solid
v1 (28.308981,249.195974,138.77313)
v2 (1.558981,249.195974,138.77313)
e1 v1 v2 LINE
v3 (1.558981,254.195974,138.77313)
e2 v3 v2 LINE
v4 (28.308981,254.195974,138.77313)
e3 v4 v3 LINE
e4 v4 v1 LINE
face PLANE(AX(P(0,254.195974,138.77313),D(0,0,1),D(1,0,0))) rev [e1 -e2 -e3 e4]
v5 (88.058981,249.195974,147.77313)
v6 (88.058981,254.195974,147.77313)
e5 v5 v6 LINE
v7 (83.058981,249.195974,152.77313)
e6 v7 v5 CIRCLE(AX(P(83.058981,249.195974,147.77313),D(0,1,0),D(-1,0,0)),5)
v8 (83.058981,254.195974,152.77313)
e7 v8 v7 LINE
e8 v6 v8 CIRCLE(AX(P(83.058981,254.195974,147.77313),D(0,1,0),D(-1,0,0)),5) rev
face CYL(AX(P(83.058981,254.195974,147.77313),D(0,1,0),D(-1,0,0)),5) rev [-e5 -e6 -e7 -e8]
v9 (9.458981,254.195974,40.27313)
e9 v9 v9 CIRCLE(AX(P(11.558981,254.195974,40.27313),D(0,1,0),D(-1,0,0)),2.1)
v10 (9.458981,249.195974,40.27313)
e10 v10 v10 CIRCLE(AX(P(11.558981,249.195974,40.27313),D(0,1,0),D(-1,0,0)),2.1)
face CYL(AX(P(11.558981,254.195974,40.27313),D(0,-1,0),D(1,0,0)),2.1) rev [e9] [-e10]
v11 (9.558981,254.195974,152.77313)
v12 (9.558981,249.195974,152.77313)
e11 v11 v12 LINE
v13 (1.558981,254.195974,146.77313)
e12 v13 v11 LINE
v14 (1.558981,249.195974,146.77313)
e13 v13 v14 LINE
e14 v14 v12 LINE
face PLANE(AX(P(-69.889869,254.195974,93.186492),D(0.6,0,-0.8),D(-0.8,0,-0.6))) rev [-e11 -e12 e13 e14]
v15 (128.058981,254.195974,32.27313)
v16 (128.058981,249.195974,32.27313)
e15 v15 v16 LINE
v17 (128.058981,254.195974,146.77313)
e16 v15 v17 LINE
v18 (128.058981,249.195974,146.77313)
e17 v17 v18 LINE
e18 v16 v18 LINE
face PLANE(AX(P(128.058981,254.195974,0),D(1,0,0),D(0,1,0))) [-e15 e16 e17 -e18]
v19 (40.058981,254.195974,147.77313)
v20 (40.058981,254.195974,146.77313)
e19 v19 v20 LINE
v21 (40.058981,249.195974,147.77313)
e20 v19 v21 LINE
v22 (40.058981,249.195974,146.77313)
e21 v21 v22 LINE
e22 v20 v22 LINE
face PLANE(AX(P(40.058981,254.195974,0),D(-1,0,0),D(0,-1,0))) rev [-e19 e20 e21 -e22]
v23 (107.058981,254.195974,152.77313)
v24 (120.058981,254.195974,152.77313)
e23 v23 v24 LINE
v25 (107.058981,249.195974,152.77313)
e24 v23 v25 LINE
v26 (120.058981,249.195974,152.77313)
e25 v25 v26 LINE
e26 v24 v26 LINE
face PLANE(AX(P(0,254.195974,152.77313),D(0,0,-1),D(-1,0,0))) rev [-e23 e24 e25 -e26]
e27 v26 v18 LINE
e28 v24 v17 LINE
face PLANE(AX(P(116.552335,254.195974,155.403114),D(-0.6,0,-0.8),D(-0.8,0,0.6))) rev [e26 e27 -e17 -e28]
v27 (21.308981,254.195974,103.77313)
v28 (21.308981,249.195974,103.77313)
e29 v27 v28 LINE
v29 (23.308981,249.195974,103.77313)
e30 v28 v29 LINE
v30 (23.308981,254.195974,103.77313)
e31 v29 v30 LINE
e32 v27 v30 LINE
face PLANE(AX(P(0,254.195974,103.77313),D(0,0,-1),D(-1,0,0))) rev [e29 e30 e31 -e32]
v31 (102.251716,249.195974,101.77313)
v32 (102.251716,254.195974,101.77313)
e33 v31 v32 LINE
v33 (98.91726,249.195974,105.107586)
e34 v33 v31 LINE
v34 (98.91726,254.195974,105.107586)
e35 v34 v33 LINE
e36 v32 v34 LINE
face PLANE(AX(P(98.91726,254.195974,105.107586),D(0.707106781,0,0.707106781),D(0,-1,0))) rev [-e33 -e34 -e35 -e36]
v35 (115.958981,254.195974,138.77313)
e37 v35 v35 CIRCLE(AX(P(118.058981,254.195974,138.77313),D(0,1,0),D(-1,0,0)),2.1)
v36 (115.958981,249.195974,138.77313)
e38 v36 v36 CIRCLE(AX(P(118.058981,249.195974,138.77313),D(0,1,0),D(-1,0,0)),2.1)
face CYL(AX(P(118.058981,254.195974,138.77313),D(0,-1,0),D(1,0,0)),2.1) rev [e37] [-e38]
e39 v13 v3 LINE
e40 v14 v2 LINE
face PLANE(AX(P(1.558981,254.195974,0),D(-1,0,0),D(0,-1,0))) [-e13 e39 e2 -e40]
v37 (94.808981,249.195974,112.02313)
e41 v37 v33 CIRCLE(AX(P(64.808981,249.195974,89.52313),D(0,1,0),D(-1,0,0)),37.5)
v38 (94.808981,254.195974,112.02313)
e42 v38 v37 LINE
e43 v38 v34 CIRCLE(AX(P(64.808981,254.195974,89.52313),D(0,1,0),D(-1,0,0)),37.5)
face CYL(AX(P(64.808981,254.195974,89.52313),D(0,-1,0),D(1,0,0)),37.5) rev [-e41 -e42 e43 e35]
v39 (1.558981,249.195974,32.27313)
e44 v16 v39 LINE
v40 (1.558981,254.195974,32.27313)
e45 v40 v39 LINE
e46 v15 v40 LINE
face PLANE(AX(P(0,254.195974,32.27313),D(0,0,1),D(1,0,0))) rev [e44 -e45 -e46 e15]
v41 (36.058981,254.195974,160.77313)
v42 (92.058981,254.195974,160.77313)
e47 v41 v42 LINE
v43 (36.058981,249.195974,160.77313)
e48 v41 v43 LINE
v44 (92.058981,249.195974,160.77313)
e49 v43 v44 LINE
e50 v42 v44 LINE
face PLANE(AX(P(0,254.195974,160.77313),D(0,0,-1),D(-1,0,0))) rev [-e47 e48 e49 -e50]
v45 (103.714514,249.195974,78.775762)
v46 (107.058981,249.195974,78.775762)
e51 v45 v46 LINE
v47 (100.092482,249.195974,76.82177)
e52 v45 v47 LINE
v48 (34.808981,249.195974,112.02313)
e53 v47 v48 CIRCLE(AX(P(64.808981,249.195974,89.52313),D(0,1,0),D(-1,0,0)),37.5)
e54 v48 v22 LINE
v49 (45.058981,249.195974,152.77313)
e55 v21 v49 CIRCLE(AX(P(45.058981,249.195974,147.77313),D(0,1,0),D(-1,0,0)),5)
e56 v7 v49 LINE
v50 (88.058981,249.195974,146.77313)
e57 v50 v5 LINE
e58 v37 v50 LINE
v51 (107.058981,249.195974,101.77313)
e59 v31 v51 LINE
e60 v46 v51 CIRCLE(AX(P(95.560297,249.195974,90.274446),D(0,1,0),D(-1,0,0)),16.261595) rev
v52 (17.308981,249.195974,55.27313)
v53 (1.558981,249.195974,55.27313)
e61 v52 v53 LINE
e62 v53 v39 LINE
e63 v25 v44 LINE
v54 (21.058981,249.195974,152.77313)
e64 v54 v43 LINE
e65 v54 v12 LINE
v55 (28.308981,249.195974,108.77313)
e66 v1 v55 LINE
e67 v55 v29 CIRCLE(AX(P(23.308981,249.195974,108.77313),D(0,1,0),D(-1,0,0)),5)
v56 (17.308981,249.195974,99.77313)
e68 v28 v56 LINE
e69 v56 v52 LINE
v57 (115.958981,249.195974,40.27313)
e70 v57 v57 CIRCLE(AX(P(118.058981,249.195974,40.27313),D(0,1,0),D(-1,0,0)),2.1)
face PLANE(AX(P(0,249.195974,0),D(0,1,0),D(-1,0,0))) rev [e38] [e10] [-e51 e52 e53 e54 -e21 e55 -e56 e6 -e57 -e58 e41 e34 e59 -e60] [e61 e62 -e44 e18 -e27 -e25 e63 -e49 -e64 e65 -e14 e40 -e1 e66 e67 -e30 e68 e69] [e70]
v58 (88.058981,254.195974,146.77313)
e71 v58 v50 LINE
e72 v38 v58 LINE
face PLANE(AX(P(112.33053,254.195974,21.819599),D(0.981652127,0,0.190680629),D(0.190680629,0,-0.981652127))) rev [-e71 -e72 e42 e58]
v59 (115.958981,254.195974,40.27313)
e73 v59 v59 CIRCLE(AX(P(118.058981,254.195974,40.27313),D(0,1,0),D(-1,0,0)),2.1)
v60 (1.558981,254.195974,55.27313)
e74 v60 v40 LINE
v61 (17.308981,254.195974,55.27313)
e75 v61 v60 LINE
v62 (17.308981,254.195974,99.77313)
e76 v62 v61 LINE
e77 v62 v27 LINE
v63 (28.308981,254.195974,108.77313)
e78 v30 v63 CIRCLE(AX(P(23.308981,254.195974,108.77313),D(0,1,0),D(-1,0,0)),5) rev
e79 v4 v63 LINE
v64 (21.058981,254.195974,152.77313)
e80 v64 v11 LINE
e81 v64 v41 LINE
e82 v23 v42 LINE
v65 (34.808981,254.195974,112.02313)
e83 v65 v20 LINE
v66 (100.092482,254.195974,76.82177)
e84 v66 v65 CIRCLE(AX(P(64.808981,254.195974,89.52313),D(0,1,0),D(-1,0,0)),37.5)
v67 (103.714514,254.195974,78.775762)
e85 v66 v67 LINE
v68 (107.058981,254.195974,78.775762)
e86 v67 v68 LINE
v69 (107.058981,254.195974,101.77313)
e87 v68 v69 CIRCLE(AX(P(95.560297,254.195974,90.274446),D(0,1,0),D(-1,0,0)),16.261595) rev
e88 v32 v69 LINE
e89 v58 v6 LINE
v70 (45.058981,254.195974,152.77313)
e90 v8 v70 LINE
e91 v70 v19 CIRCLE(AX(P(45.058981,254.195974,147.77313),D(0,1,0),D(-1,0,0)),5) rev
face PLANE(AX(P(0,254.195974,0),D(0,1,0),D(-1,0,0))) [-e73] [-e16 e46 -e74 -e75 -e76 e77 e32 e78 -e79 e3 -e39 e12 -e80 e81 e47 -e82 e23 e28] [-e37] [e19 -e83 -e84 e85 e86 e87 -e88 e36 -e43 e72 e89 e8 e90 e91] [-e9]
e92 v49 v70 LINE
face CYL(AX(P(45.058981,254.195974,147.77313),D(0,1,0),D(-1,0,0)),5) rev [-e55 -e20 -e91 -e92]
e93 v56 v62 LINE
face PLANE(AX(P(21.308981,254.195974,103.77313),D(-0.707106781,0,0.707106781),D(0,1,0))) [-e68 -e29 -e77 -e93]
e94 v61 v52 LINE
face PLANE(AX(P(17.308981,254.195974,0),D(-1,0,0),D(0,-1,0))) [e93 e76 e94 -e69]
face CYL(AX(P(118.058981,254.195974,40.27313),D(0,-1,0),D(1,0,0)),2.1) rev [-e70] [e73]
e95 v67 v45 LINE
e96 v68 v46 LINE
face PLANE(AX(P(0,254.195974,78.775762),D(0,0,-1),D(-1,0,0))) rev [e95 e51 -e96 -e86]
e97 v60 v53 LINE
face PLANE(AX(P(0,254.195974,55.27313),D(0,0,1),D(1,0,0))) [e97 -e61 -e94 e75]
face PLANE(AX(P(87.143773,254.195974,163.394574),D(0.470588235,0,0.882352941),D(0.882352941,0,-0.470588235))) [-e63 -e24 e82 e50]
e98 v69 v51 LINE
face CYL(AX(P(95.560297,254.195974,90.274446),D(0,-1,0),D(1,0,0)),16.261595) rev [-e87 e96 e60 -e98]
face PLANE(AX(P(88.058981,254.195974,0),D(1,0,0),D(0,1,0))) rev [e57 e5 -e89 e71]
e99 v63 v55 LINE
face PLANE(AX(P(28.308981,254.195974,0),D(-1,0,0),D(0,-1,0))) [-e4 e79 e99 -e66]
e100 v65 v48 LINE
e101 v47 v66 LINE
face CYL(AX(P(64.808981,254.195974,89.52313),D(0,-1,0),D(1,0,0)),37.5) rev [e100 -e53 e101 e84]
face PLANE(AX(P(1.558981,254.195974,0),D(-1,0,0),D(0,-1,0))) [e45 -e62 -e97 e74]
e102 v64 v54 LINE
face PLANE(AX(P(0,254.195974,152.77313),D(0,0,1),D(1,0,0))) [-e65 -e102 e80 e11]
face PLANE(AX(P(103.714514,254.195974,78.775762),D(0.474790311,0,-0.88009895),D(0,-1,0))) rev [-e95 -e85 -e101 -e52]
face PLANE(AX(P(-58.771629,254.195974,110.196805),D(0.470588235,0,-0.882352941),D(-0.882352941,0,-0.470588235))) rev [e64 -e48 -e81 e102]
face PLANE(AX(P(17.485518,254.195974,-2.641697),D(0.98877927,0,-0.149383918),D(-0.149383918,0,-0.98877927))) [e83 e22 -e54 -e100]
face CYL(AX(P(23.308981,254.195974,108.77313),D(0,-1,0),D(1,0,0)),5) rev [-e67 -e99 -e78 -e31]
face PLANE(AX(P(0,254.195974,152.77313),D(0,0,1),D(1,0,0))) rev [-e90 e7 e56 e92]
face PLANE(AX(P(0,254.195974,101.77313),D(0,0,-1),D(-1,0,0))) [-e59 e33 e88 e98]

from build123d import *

# Parameters (mm, degrees)
SKETCH_1_R       = 2.1
EXTRUDE_3_DEPTH  = 5
FILLET_1_R       = 5
CHAMFER_1_SIZE   = 2
CHAMFER_1_SIZE_2 = 2.97860662
CHAMFER_2_SIZE   = 4


with BuildPart() as part:
    # Эскиз1 → Бобышка-Вытянуть3 (new body)
    # profile 1 of 4: a face of its own
    with BuildSketch(Plane(origin=(0, 249.195974268, 0), x_dir=(1, 0, 0), z_dir=(0, 1, 0))):
        with BuildLine():
            ThreePointArc((100.251716198, -101.773129836), (97.92926953, -107.109956368), (94.808980694, -112.023129836))
            Line((94.808980694, -112.023129836), (88.058980694, -146.773129836))
            Line((88.058980694, -146.773129836), (100.251716198, -146.773129836))
            Line((100.251716198, -146.773129836), (100.251716198, -101.773129836))
        make_face()
    # profile 2 of 4: a face of its own
    with BuildSketch(Plane(origin=(0, 249.195974268, 0), x_dir=(1, 0, 0), z_dir=(0, 1, 0))):
        with BuildLine():
            Line((1.558980694, -138.773129836), (1.558980694, -146.773129836))
            Line((1.558980694, -146.773129836), (40.058980694, -146.773129836))
            Line((40.058980694, -146.773129836), (34.808980694, -112.023129836))
            ThreePointArc((34.808980694, -112.023129836), (28.511671278, -80.102125156), (49.53850264, -55.273129836))
            ThreePointArc((49.53850264, -55.273129836), (64.808980694, -52.023129836), (80.079458748, -55.273129836))
            ThreePointArc((80.079458748, -55.273129836), (92.976106795, -64.767059728), (100.735907579, -78.775761573))
            Line((100.735907579, -78.775761573), (100.735907579, -32.273129836))
            Line((100.735907579, -32.273129836), (1.558980694, -32.273129836))
            Line((1.558980694, -32.273129836), (1.558980694, -55.273129836))
            Line((1.558980694, -55.273129836), (17.308980694, -55.273129836))
            Line((17.308980694, -55.273129836), (17.308980694, -89.523129836))
            Line((17.308980694, -89.523129836), (17.308980694, -103.773129836))
            Line((17.308980694, -103.773129836), (28.308980694, -103.773129836))
            Line((28.308980694, -103.773129836), (28.308980694, -138.773129836))
            Line((28.308980694, -138.773129836), (1.558980694, -138.773129836))
        make_face()
        with Locations(Location((11.55898069, -40.273129836, 0), (0, 0, 180))):
            Circle(SKETCH_1_R, mode=Mode.SUBTRACT)
    # profile 3 of 4: a face of its own
    with BuildSketch(Plane(origin=(0, 249.195974268, 0), x_dir=(1, 0, 0), z_dir=(0, 1, 0))):
        Polygon((88.058980694, -160.773129836), (40.058980694, -160.773129836), (36.058980694, -160.773129836), (21.058980694, -152.773129836), (9.558980694, -152.773129836), (1.558980694, -146.773129836), (40.058980694, -146.773129836), (40.058980694, -152.773129836), (88.058980694, -152.773129836), align=None)
    # profile 4 of 4: a face of its own
    with BuildSketch(Plane(origin=(0, 249.195974268, 0), x_dir=(1, 0, 0), z_dir=(0, 1, 0))):
        with BuildLine():
            Line((88.058980694, -146.773129836), (88.058980694, -152.773129836))
            Line((88.058980694, -152.773129836), (88.058980694, -160.773129836))
            Line((88.058980694, -160.773129836), (92.058980694, -160.773129836))
            Line((92.058980694, -160.773129836), (107.058980694, -152.773129836))
            Line((107.058980694, -152.773129836), (120.058980694, -152.773129836))
            Line((120.058980694, -152.773129836), (128.058980694, -146.773129836))
            Line((128.058980694, -146.773129836), (128.058980694, -55.273129836))
            Line((128.058980694, -55.273129836), (128.058980694, -32.273129836))
            Line((128.058980694, -32.273129836), (107.058980694, -32.273129836))
            Line((107.058980694, -32.273129836), (100.735907579, -32.273129836))
            Line((100.735907579, -32.273129836), (100.735907579, -78.775761573))
            Line((100.735907579, -78.775761573), (107.058980694, -78.775761573))
            ThreePointArc((107.058980694, -78.775761573), (111.821891611, -90.274445705), (107.058980694, -101.773129836))
            Line((107.058980694, -101.773129836), (100.251716198, -101.773129836))
            Line((100.251716198, -101.773129836), (100.251716198, -146.773129836))
            Line((100.251716198, -146.773129836), (88.058980694, -146.773129836))
        make_face()
        with Locations(Location((118.058980694, -138.773129836, 0), (0, 0, 180))):
            Circle(SKETCH_1_R, mode=Mode.SUBTRACT)
        with Locations(Location((118.058980694, -40.273129836, 0), (0, 0, 180))):
            Circle(SKETCH_1_R, mode=Mode.SUBTRACT)
    extrude(amount=EXTRUDE_3_DEPTH)

    # Скругление1
    fillet_1_edges = [part.edges().sort_by_distance(p)[0] for p in [
        (28.308980694, 251.695974268, 103.773129836),
        (40.058980694, 251.695974268, 152.773129836),
        (88.058980694, 251.695974268, 152.773129836),
    ]]
    fillet(fillet_1_edges, radius=FILLET_1_R)

    # Фаска1
    # the kernel refuses this chamfer: 3.233771195, 2.97860662, 2 mm, written as the material it takes off along each edge
    with BuildSketch(Plane(origin=(100.251716198, 239.918924652, 101.773129836), x_dir=(-0.3715523502271027, -3.437549783964329e-15, 0.9284120050067838), z_dir=(0, 1, 0))) as chamfer_1_piece_1:
        with BuildLine():
            Line((3.591569227, 0), (-CHAMFER_1_SIZE * 0.371552350227, CHAMFER_1_SIZE * 0.928412005007))
            Line((-CHAMFER_1_SIZE * 0.371552350227, CHAMFER_1_SIZE * 0.928412005007), (0, 0))
            ThreePointArc((0, 0), (1.855343846, 0.04297528), (3.591569227, 0))
        make_face()
    extrude(amount=23.554099231, mode=Mode.SUBTRACT)
    with BuildSketch(Plane(origin=(100.735907579, 241.48601373, 78.775761573), x_dir=(-0.31276738664383585, -2.8936796166985435e-15, -0.9498297541412279), z_dir=(0, 1, 0))) as chamfer_1_piece_2:
        with BuildLine():
            Line((2.057201754, 0), (-CHAMFER_1_SIZE_2 * 0.312767386639, -CHAMFER_1_SIZE_2 * 0.949829754125))
            Line((-CHAMFER_1_SIZE_2 * 0.312767386639, -CHAMFER_1_SIZE_2 * 0.949829754125), (0, 0))
            ThreePointArc((0, 0), (1.071927906, -0.014084555), (2.057201754, 0))
        make_face()
    extrude(amount=20.419921076, mode=Mode.SUBTRACT)

    # Фаска2
    chamfer_2_edges = [part.edges().sort_by_distance(p)[0] for p in [
        (17.308980694, 251.695974268, 103.773129836),
    ]]
    chamfer(chamfer_2_edges, length=CHAMFER_2_SIZE)


solid = part.part
